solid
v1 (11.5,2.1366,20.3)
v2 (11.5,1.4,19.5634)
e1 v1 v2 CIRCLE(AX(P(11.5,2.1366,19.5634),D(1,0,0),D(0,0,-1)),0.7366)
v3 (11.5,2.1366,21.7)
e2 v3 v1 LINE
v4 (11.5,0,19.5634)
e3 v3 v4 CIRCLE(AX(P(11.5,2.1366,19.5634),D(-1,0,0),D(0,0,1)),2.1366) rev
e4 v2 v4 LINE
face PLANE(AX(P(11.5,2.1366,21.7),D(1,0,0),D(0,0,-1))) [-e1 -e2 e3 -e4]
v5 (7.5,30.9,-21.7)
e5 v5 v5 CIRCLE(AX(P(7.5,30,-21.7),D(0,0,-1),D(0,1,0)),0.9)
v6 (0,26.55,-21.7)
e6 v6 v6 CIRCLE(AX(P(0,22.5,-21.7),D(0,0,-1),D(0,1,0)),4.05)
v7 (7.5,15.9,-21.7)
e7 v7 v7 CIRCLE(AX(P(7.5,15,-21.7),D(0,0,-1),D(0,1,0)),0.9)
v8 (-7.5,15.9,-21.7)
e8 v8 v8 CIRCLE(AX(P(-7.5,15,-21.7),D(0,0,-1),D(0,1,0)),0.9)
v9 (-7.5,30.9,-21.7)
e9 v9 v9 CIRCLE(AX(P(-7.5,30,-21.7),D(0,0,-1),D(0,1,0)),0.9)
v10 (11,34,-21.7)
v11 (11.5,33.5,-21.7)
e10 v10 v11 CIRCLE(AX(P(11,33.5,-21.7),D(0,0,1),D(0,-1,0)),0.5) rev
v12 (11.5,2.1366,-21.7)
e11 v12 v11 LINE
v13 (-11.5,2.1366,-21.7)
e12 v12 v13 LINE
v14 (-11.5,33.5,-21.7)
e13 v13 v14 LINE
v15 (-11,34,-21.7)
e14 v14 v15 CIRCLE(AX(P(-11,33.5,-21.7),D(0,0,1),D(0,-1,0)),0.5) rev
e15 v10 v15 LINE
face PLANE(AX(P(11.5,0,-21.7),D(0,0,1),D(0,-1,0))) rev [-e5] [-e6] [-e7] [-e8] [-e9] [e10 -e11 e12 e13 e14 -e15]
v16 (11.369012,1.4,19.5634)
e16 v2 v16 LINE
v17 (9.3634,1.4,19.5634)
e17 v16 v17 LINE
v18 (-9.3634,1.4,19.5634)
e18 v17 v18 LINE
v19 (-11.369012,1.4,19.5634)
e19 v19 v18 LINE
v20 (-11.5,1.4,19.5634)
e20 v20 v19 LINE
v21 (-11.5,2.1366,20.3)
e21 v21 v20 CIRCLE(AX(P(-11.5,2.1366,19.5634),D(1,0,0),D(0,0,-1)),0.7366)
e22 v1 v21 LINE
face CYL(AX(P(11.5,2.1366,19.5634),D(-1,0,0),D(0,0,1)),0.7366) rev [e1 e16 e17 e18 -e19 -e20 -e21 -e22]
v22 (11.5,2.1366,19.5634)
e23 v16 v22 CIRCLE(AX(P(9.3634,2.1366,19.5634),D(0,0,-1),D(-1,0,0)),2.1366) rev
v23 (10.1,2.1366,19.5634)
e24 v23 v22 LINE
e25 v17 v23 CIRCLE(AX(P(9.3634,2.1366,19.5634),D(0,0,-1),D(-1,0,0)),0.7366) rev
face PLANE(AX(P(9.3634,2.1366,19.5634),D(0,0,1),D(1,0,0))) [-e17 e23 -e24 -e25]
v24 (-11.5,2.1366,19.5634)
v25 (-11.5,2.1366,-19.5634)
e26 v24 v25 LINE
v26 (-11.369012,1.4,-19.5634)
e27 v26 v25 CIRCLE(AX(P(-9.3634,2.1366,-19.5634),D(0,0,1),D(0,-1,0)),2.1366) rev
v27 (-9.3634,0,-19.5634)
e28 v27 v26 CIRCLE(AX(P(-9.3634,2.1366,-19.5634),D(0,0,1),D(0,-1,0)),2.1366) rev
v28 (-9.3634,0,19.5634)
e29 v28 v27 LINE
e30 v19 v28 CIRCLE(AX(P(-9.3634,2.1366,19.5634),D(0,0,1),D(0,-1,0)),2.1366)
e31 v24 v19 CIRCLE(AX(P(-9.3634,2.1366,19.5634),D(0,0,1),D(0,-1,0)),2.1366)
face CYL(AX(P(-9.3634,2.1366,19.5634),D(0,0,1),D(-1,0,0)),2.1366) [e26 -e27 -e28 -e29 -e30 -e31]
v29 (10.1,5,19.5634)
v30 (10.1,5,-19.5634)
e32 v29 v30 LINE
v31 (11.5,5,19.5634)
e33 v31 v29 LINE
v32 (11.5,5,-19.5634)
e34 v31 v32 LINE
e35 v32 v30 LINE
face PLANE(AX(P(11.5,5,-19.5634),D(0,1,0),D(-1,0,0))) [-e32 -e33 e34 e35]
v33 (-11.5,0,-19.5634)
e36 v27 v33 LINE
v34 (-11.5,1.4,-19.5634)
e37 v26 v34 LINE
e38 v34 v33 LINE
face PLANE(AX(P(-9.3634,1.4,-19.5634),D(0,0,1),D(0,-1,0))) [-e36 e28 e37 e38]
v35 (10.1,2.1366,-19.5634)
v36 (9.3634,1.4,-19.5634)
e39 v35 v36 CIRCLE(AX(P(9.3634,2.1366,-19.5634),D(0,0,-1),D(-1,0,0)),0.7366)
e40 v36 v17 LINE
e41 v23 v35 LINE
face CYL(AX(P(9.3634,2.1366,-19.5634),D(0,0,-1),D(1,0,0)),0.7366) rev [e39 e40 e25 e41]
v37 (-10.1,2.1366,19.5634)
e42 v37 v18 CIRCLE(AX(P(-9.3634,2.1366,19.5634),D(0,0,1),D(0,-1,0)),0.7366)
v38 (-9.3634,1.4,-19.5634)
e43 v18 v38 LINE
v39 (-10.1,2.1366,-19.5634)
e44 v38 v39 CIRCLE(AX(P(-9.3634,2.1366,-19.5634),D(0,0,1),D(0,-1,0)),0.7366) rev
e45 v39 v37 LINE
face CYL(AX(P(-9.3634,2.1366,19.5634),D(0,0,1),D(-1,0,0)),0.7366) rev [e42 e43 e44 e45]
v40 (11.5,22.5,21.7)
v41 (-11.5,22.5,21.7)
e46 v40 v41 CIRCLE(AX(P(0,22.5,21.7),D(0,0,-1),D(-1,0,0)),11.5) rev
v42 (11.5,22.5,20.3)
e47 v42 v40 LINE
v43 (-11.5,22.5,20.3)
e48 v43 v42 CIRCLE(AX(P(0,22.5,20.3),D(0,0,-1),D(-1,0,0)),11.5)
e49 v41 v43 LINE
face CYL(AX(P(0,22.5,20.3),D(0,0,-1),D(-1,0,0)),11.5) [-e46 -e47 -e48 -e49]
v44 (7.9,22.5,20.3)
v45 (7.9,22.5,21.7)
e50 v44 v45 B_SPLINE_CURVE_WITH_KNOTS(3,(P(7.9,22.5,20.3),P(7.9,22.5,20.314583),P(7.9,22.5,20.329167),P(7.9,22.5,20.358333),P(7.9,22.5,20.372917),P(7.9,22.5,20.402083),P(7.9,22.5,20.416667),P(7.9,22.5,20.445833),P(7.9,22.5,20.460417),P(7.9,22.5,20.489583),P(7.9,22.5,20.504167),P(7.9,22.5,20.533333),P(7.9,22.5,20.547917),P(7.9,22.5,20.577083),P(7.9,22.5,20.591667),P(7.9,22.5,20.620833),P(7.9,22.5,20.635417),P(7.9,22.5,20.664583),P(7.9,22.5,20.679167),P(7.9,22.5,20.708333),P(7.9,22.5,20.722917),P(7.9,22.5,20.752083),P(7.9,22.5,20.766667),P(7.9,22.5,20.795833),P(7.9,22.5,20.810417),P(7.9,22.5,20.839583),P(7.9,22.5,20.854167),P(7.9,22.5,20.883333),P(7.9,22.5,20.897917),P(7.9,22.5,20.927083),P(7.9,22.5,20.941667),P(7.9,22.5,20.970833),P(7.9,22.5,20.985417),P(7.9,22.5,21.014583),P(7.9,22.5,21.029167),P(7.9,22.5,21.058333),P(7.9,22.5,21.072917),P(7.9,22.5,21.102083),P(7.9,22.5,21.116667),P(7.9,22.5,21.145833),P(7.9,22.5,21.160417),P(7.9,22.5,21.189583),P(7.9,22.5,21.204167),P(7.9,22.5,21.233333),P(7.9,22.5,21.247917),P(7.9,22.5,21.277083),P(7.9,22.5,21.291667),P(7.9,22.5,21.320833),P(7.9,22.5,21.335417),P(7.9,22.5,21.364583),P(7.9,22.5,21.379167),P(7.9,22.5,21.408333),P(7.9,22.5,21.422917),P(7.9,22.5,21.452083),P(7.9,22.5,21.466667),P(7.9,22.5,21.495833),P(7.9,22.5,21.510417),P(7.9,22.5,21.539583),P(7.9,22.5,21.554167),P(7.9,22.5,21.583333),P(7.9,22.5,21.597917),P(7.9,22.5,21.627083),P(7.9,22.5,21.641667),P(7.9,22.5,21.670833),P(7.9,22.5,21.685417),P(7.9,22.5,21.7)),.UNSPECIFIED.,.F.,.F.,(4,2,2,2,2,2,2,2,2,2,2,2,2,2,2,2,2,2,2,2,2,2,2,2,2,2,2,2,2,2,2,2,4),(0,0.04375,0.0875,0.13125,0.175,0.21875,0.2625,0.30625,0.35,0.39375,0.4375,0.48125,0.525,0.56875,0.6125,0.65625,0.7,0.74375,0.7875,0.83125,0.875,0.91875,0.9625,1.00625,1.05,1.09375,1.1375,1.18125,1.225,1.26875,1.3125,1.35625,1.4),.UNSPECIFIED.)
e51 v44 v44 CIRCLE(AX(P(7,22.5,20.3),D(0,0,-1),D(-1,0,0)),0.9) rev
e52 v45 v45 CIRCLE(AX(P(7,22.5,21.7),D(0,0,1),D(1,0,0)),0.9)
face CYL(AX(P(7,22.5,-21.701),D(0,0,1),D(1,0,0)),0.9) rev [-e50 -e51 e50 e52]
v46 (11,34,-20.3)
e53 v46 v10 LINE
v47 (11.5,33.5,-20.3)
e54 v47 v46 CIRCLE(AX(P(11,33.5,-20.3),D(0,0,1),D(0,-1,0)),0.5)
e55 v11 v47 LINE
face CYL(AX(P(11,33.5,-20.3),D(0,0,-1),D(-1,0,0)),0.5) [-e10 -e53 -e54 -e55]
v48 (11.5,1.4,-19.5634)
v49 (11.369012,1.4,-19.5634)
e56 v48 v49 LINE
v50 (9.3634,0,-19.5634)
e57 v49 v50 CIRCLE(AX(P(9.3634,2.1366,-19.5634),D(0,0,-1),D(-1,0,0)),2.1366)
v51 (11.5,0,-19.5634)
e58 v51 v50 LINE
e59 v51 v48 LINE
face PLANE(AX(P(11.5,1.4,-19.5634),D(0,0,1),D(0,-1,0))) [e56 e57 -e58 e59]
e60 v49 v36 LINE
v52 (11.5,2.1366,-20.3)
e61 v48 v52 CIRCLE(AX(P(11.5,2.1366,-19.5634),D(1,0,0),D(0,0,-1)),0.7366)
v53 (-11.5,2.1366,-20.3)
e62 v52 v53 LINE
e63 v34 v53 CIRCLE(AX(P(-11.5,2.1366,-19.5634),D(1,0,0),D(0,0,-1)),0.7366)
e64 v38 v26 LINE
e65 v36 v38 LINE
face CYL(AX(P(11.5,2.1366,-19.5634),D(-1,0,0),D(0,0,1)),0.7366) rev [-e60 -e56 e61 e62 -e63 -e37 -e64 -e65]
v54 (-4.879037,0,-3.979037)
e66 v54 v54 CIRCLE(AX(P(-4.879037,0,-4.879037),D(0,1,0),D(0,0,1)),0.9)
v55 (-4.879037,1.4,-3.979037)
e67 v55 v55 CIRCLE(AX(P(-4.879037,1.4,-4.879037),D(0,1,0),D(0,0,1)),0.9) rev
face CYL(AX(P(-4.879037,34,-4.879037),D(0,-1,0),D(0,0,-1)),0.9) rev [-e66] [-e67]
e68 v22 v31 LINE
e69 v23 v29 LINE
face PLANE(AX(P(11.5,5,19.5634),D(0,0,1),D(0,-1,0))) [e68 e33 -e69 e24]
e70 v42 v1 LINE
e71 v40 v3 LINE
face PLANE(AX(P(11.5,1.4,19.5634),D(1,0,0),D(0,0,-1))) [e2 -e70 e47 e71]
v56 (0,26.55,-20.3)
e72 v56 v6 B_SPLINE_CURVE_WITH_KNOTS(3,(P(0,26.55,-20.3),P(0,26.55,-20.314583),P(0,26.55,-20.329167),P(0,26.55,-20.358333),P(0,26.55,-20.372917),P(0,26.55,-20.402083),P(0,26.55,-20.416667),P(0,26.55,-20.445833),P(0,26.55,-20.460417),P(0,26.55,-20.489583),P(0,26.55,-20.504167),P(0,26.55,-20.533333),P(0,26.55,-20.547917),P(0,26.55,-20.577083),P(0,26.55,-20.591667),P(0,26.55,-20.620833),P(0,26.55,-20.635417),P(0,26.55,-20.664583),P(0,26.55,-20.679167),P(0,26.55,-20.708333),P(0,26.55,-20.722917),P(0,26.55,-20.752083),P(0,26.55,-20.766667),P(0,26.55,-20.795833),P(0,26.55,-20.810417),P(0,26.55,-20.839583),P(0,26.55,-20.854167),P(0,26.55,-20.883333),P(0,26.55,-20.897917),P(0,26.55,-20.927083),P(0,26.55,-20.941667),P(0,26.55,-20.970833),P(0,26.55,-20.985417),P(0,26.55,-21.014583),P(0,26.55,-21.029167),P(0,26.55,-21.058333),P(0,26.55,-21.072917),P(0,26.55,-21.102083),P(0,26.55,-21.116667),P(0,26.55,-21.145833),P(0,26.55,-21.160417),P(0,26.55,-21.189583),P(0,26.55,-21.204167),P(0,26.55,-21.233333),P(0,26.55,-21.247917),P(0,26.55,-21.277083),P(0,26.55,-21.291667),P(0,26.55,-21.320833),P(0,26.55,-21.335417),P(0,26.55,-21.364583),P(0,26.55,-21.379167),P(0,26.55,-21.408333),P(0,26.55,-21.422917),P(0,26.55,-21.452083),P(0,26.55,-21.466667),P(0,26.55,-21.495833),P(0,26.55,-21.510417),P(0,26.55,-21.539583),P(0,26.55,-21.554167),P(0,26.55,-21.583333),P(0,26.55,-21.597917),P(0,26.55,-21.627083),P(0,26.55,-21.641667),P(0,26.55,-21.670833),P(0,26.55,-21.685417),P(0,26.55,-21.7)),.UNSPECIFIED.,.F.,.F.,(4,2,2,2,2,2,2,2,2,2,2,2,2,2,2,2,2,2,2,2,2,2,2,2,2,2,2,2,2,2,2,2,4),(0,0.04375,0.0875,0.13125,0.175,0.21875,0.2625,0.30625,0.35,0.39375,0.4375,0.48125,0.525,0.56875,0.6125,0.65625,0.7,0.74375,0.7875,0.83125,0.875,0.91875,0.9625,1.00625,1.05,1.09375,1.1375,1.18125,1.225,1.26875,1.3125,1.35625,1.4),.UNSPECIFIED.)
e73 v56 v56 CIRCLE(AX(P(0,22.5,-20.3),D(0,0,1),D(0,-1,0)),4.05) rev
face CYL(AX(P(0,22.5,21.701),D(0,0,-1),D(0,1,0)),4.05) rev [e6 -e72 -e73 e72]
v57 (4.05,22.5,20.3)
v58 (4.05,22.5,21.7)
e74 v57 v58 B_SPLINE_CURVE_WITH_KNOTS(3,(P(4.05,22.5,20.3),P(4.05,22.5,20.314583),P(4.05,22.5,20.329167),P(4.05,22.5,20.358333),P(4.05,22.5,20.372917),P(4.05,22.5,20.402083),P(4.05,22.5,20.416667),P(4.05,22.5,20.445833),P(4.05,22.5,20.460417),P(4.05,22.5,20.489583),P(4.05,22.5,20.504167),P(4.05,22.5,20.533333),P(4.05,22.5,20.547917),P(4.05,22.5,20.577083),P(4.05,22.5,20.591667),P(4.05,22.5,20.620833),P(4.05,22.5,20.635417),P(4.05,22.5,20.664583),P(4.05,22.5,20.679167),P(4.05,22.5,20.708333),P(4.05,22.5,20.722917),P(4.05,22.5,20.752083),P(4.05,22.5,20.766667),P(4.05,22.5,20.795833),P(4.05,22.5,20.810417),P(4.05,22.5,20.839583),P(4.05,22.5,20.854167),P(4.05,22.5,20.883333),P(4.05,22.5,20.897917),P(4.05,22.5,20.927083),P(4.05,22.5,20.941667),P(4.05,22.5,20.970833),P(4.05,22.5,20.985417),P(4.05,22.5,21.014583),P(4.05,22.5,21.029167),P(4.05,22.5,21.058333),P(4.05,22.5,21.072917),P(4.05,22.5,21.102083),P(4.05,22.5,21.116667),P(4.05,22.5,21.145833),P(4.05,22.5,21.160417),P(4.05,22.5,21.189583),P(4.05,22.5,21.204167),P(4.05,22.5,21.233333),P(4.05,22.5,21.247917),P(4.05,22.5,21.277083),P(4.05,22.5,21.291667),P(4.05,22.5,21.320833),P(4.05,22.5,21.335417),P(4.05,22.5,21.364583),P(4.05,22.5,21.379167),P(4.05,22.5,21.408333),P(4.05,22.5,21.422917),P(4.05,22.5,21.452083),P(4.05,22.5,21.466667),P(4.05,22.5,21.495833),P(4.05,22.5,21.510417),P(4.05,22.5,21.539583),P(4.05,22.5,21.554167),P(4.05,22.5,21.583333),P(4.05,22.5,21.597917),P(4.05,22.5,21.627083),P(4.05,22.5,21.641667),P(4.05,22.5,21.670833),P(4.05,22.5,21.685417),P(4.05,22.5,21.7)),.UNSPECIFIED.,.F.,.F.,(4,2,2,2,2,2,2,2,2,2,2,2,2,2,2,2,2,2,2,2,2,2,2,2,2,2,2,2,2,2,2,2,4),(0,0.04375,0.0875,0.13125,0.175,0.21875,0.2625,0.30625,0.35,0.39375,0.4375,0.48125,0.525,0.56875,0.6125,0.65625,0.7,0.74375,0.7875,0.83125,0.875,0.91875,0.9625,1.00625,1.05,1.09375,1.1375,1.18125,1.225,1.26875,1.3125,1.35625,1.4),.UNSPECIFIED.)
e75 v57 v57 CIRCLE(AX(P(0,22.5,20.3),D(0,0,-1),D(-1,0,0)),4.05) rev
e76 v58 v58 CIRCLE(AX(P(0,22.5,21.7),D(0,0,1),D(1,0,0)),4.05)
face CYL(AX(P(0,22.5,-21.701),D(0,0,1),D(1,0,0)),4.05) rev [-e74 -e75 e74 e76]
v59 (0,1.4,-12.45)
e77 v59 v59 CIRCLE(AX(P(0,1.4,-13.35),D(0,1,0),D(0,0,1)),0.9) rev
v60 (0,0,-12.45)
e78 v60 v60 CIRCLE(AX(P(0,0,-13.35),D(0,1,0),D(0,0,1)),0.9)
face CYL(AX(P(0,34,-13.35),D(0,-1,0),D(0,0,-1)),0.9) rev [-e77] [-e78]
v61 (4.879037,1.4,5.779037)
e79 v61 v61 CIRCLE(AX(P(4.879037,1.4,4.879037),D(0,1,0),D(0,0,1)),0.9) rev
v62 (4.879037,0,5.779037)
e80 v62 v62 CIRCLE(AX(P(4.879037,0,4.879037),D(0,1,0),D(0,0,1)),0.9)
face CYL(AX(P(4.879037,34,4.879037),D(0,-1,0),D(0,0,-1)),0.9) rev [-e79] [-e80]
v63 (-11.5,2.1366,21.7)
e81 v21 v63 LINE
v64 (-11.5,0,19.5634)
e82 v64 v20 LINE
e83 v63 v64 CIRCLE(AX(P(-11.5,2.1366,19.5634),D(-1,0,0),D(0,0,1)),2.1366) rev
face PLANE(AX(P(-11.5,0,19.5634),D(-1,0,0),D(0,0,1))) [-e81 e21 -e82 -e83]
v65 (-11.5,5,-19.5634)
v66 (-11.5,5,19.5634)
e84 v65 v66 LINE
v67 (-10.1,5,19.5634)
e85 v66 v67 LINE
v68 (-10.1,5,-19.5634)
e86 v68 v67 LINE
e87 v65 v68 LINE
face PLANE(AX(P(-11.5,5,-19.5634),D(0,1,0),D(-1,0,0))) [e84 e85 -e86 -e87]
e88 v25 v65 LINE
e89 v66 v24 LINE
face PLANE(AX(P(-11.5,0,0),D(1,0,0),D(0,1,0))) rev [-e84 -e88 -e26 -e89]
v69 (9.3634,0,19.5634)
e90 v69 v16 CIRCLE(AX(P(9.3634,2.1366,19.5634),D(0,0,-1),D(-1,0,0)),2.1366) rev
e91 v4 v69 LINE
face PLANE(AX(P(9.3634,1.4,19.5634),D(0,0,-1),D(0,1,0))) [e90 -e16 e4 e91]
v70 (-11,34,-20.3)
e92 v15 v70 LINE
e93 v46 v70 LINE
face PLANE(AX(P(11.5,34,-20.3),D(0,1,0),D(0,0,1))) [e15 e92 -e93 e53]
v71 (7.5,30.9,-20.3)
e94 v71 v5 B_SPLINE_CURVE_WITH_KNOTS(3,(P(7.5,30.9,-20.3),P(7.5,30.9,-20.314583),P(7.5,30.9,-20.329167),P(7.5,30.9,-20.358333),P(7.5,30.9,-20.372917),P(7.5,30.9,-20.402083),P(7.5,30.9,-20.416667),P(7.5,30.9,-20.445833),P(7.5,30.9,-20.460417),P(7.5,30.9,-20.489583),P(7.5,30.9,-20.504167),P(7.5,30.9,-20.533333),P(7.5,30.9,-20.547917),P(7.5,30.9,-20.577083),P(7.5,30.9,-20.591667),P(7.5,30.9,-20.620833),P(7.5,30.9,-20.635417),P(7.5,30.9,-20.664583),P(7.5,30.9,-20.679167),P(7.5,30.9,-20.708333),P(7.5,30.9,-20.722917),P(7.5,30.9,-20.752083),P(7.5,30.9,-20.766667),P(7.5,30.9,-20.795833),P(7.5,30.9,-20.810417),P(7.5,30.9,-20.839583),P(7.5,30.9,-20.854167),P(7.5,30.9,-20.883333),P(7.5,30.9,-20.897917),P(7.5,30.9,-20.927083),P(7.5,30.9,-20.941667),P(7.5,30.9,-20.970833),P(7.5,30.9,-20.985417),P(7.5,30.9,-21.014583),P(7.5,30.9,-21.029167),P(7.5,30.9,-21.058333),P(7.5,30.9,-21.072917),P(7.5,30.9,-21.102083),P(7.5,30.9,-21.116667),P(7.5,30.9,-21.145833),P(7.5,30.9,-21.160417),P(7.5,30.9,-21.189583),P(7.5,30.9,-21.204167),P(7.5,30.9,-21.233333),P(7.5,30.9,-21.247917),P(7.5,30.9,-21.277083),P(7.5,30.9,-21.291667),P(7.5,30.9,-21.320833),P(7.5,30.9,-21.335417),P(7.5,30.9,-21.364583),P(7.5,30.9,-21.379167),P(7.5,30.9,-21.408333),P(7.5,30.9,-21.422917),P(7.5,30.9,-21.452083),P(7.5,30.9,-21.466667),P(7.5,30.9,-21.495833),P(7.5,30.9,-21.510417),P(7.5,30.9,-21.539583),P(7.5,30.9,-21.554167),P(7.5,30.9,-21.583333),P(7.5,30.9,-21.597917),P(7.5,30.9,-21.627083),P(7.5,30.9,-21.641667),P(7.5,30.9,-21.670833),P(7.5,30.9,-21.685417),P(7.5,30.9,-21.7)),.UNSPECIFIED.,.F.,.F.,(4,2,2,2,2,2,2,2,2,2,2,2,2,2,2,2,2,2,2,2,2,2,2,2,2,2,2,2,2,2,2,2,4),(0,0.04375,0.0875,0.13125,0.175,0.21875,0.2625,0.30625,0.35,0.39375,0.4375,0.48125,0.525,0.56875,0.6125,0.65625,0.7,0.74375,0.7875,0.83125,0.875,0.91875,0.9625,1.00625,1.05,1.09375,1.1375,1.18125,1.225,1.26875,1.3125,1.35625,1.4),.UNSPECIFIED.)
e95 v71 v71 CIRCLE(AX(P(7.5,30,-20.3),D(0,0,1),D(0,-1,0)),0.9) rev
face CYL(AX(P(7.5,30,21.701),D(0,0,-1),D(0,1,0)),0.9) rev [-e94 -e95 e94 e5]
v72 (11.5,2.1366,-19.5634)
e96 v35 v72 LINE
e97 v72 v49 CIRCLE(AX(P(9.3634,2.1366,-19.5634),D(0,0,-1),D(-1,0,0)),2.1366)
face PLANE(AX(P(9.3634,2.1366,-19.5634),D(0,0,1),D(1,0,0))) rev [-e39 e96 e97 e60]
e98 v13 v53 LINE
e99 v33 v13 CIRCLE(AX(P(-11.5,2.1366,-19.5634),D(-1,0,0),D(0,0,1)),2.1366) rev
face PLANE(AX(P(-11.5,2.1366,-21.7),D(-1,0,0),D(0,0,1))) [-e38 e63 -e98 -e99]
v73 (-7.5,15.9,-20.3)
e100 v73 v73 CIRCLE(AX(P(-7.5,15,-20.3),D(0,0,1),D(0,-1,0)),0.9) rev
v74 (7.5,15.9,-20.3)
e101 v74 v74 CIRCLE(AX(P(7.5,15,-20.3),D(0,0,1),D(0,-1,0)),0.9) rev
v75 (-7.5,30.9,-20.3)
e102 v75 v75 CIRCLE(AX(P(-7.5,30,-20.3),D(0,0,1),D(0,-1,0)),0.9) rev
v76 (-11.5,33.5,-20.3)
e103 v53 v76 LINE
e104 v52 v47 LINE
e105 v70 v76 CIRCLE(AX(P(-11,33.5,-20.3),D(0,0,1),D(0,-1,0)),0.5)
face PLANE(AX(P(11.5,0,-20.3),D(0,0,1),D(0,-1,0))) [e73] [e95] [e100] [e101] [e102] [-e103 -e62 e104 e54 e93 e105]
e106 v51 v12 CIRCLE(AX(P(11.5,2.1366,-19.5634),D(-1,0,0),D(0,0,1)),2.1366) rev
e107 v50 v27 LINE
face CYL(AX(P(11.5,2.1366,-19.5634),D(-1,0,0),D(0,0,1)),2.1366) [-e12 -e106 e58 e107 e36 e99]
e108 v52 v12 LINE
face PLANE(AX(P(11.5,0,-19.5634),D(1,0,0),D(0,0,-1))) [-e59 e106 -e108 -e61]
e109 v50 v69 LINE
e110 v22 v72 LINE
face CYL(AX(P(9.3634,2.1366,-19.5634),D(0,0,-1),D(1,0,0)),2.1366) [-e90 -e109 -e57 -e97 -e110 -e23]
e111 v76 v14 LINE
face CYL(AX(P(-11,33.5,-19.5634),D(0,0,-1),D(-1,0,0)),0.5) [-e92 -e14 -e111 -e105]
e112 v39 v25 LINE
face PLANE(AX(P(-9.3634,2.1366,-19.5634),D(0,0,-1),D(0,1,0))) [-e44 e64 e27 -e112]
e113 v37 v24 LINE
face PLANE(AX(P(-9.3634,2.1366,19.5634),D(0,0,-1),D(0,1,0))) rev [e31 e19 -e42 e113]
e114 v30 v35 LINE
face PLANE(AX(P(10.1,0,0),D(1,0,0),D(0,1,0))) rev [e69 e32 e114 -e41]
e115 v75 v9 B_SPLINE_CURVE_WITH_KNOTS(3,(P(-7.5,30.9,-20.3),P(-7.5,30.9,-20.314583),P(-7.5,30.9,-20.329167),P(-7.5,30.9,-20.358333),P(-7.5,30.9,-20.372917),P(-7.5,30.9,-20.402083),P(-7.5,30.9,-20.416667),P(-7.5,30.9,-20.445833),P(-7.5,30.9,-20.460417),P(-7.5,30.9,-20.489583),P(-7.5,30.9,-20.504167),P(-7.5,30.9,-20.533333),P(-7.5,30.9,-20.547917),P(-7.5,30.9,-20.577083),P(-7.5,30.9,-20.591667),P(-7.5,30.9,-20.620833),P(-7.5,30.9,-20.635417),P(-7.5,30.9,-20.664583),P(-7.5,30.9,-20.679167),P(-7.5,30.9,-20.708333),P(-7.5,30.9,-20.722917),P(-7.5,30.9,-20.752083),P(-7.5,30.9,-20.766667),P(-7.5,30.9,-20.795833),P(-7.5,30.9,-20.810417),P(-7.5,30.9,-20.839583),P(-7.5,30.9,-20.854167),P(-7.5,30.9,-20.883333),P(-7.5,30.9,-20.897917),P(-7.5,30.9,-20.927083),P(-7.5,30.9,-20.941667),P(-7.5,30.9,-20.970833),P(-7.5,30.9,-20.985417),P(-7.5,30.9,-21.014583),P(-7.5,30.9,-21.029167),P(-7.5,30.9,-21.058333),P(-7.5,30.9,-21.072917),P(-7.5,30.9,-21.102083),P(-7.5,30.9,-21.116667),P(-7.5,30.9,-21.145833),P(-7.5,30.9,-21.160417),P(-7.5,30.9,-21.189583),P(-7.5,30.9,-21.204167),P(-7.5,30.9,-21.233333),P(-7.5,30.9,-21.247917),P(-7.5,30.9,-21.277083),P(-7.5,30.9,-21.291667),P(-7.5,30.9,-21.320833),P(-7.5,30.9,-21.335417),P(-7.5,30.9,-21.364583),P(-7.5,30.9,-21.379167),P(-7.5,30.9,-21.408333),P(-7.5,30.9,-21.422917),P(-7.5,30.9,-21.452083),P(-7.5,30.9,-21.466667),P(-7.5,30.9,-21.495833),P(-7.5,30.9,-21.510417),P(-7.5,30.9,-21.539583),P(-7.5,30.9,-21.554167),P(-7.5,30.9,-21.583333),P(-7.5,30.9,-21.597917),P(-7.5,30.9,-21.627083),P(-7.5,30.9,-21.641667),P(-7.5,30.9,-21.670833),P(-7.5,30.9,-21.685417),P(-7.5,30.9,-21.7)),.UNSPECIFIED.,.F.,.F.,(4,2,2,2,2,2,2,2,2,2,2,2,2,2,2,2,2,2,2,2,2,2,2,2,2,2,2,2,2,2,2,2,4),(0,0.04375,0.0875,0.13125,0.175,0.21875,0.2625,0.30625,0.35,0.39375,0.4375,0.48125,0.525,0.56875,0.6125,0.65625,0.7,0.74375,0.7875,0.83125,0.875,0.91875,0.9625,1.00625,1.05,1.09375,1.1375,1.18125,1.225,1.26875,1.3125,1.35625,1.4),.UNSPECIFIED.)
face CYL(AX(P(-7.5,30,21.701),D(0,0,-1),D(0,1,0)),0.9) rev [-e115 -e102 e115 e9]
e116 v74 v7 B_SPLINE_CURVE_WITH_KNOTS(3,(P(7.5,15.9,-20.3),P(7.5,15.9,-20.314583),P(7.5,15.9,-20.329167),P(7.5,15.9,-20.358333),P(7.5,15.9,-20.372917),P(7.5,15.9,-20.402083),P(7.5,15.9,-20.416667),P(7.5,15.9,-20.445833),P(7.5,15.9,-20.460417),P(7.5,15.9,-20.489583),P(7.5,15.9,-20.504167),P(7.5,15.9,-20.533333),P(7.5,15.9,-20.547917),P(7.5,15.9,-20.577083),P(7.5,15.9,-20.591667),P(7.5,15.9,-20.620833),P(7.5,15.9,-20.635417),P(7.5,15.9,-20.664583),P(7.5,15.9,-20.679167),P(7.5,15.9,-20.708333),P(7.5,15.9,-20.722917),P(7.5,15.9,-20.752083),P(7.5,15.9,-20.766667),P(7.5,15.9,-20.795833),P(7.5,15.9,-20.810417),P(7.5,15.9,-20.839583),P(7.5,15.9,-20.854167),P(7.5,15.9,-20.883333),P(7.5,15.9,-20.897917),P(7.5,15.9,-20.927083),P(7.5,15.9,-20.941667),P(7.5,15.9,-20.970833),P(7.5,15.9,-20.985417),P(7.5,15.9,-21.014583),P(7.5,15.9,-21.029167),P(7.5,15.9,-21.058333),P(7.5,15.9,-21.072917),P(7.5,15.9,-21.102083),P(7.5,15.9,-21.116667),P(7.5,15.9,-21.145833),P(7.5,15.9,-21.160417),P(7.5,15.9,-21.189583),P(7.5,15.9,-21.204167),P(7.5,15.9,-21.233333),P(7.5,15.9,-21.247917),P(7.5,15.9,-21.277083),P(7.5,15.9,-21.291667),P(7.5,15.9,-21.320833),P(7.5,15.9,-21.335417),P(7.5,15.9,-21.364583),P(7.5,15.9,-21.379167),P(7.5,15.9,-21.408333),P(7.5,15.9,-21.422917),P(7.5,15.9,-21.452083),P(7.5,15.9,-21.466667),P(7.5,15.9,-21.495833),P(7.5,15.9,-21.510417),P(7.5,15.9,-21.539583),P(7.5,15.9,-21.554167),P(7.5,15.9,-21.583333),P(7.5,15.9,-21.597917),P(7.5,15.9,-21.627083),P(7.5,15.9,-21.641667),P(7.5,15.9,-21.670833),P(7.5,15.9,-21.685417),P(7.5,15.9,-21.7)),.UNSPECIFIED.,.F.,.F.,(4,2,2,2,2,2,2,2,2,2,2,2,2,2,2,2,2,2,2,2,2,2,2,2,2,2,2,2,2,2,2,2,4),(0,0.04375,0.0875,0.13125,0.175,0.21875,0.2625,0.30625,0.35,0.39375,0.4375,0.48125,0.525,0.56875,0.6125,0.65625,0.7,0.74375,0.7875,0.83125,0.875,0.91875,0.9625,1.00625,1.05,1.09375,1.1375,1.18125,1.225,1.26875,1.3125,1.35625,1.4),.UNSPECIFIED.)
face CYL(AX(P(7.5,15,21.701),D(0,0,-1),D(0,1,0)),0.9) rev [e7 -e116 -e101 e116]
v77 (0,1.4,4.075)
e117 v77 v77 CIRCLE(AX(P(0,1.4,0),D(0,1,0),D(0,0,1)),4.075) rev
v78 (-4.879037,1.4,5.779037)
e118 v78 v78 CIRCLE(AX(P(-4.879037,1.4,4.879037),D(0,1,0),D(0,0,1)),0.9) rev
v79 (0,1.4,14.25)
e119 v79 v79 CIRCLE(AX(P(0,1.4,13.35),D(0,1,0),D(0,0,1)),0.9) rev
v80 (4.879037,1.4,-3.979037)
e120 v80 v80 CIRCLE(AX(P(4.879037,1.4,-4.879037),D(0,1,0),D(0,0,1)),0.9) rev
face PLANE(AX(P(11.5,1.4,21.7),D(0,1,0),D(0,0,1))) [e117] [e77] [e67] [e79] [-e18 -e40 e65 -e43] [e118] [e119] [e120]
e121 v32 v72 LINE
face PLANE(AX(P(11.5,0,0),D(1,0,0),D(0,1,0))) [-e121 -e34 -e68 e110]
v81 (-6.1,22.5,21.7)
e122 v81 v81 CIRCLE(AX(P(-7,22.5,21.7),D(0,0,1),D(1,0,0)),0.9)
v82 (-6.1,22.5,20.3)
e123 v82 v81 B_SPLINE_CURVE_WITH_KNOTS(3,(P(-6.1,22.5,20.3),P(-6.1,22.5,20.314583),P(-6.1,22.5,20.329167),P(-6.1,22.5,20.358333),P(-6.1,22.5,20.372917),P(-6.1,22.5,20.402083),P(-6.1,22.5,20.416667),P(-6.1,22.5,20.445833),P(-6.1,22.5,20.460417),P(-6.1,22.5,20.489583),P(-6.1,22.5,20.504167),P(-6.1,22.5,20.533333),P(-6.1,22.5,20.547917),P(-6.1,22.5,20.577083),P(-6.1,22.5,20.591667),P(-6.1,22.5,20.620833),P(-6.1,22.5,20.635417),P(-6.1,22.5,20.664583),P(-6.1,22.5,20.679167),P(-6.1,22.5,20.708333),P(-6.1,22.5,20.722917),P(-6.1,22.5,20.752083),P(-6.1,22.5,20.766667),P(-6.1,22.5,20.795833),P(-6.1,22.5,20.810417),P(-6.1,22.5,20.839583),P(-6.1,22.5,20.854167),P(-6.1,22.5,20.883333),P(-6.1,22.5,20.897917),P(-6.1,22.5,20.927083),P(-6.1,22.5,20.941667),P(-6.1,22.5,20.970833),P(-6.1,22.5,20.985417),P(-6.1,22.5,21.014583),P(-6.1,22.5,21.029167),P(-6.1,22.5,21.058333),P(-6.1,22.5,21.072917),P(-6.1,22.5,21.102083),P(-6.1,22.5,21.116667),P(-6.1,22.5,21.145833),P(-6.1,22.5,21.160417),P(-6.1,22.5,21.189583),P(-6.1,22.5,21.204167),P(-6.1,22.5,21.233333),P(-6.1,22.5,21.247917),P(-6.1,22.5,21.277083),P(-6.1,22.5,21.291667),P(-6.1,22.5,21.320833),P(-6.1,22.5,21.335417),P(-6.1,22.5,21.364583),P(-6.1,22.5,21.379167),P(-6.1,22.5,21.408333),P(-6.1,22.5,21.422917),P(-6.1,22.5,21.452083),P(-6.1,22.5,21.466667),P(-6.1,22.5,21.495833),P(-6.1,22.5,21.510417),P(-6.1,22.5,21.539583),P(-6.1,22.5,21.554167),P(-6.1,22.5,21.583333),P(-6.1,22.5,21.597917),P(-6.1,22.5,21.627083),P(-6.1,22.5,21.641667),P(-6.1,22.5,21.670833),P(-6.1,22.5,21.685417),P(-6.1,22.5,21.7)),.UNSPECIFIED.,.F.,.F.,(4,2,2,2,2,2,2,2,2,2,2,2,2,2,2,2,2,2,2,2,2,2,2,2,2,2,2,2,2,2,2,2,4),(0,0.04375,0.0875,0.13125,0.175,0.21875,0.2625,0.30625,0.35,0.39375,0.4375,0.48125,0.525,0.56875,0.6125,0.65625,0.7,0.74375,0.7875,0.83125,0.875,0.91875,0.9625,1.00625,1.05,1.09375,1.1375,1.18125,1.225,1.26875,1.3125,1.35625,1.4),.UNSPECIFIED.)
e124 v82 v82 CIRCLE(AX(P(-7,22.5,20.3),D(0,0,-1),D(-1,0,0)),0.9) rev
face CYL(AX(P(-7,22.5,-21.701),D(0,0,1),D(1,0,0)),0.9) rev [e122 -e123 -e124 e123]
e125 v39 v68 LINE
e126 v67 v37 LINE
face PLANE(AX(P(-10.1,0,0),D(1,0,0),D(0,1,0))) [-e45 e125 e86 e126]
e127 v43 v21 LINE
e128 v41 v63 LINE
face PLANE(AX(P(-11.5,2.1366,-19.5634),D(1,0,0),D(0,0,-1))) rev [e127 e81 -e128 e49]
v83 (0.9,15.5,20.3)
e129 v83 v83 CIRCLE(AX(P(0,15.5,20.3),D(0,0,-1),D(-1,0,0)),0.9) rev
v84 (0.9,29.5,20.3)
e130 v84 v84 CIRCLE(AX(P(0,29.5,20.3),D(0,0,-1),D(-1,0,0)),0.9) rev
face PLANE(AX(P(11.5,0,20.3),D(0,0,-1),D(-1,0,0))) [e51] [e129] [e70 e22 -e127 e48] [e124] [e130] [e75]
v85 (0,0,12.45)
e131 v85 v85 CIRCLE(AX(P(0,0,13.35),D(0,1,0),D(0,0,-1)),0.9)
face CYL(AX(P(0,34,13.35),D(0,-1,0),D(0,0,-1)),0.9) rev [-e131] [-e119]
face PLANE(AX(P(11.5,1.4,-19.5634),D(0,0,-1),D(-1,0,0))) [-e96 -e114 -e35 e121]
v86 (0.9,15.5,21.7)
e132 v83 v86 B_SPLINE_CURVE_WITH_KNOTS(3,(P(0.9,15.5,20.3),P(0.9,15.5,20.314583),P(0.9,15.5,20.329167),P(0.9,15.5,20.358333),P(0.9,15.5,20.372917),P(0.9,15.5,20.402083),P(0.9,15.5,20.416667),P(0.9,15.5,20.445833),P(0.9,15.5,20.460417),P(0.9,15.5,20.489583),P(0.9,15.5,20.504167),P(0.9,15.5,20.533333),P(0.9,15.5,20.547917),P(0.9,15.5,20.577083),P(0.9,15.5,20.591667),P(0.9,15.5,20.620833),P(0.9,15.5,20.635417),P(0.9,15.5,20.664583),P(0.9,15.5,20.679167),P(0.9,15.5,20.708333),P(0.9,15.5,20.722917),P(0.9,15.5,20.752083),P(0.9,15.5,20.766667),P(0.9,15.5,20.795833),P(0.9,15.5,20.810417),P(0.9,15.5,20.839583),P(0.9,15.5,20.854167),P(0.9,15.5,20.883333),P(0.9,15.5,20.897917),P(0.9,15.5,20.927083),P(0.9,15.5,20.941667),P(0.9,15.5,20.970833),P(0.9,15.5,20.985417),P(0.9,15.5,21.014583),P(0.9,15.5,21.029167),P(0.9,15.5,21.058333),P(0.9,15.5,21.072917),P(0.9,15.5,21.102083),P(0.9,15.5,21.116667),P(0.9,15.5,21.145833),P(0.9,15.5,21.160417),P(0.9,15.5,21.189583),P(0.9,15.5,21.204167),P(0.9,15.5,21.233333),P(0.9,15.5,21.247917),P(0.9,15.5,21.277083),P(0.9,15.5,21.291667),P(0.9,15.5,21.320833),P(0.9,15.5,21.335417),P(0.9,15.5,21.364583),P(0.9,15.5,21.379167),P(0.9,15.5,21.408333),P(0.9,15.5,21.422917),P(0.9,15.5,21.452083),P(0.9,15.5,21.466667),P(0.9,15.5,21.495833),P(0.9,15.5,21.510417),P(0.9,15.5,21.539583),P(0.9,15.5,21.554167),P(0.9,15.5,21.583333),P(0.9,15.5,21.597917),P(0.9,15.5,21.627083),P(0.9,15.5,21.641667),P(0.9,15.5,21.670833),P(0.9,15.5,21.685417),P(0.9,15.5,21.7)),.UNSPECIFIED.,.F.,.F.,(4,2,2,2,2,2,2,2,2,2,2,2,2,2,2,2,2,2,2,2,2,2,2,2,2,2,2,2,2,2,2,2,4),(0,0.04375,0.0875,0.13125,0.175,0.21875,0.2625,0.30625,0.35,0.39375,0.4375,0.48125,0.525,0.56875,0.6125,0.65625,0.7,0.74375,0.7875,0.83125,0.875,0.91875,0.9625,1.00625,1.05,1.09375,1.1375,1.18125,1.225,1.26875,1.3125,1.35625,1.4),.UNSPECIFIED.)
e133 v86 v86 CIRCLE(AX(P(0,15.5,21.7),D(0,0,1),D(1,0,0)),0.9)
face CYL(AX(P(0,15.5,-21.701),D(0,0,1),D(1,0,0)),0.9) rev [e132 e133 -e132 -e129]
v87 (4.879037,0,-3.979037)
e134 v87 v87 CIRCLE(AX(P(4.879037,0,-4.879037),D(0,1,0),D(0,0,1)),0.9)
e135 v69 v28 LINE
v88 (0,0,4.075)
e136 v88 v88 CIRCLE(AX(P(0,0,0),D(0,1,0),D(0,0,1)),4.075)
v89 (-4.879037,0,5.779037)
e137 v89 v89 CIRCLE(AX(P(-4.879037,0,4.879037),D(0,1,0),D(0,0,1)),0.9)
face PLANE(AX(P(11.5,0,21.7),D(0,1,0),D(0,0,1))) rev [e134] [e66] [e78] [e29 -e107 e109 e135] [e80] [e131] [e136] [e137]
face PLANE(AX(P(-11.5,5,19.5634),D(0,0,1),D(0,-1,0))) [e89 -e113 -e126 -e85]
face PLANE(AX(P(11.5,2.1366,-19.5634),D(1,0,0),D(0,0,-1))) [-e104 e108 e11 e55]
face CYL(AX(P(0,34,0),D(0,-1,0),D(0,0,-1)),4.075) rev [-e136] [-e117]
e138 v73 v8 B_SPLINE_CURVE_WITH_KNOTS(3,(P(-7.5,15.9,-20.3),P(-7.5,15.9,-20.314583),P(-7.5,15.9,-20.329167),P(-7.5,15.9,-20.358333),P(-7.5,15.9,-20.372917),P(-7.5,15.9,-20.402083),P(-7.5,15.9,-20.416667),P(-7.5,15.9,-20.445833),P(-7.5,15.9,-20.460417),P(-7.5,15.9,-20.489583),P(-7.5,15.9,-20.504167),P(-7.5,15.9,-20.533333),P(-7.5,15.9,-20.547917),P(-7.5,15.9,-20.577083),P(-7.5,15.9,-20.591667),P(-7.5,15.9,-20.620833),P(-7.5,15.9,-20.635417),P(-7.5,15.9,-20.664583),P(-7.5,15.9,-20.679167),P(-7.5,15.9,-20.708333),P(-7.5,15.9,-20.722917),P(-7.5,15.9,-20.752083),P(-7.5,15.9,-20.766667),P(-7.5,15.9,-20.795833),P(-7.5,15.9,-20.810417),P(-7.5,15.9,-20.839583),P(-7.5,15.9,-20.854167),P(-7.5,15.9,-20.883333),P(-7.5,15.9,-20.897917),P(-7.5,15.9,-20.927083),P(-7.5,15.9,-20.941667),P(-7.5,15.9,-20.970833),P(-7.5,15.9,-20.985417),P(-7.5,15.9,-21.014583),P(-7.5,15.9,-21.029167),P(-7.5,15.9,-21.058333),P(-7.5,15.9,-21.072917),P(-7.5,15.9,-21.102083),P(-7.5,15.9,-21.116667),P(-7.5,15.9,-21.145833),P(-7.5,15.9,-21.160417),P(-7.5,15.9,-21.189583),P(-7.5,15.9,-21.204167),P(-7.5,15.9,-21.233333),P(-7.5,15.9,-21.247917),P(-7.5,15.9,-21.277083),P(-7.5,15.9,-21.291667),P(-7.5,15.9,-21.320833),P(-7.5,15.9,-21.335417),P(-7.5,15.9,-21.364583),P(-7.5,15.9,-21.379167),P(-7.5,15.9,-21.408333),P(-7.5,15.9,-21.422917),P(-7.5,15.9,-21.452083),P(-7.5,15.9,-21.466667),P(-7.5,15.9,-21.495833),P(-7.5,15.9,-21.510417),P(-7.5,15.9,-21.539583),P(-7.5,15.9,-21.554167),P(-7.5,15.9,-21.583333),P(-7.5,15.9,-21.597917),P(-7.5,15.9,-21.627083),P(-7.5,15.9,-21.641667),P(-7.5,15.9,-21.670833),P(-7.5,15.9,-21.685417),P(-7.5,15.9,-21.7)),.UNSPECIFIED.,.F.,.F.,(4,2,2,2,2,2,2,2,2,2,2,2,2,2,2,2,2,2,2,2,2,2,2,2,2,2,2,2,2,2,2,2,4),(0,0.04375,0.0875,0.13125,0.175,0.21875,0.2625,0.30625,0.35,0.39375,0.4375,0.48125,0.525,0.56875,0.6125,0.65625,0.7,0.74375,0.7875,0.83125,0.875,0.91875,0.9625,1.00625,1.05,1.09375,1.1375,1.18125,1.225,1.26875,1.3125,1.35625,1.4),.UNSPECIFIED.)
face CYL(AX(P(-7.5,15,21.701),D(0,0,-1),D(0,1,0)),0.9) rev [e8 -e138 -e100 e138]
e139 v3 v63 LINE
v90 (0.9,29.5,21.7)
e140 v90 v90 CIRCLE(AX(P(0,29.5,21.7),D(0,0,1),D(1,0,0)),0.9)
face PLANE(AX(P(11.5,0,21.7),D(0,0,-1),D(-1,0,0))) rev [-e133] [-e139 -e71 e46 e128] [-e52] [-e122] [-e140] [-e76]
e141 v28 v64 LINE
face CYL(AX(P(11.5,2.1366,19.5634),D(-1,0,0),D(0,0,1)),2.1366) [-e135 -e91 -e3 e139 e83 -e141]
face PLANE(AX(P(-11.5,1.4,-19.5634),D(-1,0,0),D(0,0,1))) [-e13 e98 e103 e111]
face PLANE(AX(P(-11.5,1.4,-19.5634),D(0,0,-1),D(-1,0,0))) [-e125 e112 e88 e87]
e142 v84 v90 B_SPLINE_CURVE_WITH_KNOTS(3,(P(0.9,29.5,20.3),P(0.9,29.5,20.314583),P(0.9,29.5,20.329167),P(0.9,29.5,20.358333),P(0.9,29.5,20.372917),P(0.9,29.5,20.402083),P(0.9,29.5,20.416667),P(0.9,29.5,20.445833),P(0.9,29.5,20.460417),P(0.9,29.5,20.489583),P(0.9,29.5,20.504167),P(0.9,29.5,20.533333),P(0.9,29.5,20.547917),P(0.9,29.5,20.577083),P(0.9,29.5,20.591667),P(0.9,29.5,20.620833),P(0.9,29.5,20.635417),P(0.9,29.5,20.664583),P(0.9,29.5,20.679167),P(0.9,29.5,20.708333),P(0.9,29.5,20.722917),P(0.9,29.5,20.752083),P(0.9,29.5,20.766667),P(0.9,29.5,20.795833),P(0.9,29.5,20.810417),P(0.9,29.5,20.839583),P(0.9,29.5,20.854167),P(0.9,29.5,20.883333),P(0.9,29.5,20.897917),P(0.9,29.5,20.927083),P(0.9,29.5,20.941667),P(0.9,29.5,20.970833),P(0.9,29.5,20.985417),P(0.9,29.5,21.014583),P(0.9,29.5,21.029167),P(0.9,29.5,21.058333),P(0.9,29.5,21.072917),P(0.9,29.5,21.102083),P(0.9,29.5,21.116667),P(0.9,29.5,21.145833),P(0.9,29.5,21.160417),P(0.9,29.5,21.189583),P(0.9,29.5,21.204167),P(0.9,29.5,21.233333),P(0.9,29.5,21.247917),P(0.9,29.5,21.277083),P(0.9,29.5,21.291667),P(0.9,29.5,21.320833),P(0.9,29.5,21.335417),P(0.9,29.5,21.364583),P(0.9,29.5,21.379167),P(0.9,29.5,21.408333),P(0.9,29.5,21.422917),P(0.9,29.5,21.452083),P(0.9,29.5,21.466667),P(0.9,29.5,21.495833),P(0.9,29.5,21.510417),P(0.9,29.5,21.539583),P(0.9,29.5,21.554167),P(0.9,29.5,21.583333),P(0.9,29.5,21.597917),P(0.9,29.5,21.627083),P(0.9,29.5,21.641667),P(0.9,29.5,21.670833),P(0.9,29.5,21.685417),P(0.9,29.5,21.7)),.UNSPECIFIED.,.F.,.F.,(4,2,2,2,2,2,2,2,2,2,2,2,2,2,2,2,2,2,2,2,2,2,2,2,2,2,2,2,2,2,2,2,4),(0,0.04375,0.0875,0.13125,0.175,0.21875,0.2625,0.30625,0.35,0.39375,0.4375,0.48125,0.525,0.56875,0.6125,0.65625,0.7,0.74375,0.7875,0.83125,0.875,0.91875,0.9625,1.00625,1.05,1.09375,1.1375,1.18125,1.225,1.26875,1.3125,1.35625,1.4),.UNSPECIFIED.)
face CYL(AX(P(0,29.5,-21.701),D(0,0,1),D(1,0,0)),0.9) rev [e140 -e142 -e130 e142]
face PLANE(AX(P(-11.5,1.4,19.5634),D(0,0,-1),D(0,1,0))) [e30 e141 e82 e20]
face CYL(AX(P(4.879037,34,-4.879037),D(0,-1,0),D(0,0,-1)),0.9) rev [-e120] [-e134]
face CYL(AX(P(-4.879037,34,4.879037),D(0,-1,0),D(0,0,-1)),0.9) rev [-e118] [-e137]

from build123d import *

# Parameters (mm, degrees)
BASE_FLANGE1_START             = -11.5
BASE_FLANGE1_DEPTH             = 23
EDGE_FLANGE1_STRIP_W           = 7.0732
EDGE_FLANGE1_STRIP_H           = 1.4
EDGE_FLANGE1_STRIP_CUT_DEPTH   = 39.1268
EDGE_FLANGE1_STRIP_2_W         = 7.0732
EDGE_FLANGE1_STRIP_2_H         = 1.4
EDGE_FLANGE1_STRIP_CUT_2_DEPTH = 39.1268
EDGE_FLANGE1_DEPTH             = 39.1268
EDGE_FLANGE1_BEND_DEPTH        = 39.1268
FILLET1_RADIUS                 = 11.5
FILLET1_LENGTH                 = 1.4
CUT_EXTRUDE1_REACH             = 58.319
SKETCH12_R                     = 4.05
SKETCH12_R_2                   = 0.9
SKETCH13_R                     = 4.075
SKETCH13_R_2                   = 0.9
CUT_EXTRUDE2_DEPTH             = 42.942102952
FILLET2_R                      = 0.5
CUT_EXTRUDE3_REACH             = 58.319
SKETCH14_R                     = 4.05
SKETCH14_R_2                   = 0.9


# Read off the part's stored shape, not the designer's step: Base-Flange1
# Sheet-metal steps are written as plain solids
with BuildPart() as part:
    # Base-Flange1 outline → Base-Flange1 (new body)
    with BuildSketch(Plane(origin=(0, 0, 0), x_dir=(0, 0, -1), z_dir=(1, 0, 0)).offset(BASE_FLANGE1_START)):
        with BuildLine():
            Line((21.7, 2.1366), (21.7, 34))
            Line((21.7, 34), (20.3, 34))
            Line((20.3, 34), (20.3, 2.1366))
            ThreePointArc((20.3, 2.1366), (20.084254855, 1.615745145), (19.5634, 1.4))
            Line((19.5634, 1.4), (-19.5634, 1.4))
            ThreePointArc((-19.5634, 1.4), (-20.084254855, 1.615745145), (-20.3, 2.1366))
            Line((-20.3, 2.1366), (-20.3, 34))
            Line((-20.3, 34), (-21.7, 34))
            Line((-21.7, 34), (-21.7, 2.1366))
            ThreePointArc((-21.7, 2.1366), (-21.074204349, 0.625795651), (-19.5634, 0))
            Line((-19.5634, 0), (19.5634, 0))
            ThreePointArc((19.5634, 0), (21.074204349, 0.625795651), (21.7, 2.1366))
        make_face()
    extrude(amount=BASE_FLANGE1_DEPTH)

    # Edge-Flange1 strip (across the edge) → Edge-Flange1 strip cut (cut)
    with BuildSketch(Plane(origin=(11.5, 1.4, 19.5634), x_dir=(-1, 0, 0), z_dir=(0, 0, -1))):
        with Locations((-1.4, -0.7)):
            Rectangle(EDGE_FLANGE1_STRIP_W, EDGE_FLANGE1_STRIP_H)
    extrude(amount=EDGE_FLANGE1_STRIP_CUT_DEPTH, mode=Mode.SUBTRACT)

    # Edge-Flange1 strip 2 (across the edge) → Edge-Flange1 strip cut 2 (cut)
    with BuildSketch(Plane(origin=(-11.5, 1.4, -19.5634), x_dir=(1, 0, 0), z_dir=(0, 0, 1))):
        with Locations((-1.4, -0.7)):
            Rectangle(EDGE_FLANGE1_STRIP_2_W, EDGE_FLANGE1_STRIP_2_H)
    extrude(amount=EDGE_FLANGE1_STRIP_CUT_2_DEPTH, mode=Mode.SUBTRACT)

    # Edge-Flange1 section (across the edge) → Edge-Flange1 (add)
    with BuildSketch(Plane(origin=(11.5, 1.4, 19.5634), x_dir=(-1, 0, 0), z_dir=(0, 0, -1))):
        with BuildLine():
            Line((0, 0.7366), (0, 3.6))
            Line((0, 3.6), (1.4, 3.6))
            Line((1.4, 3.6), (1.4, 0.7366))
            ThreePointArc((1.4, 0.7366), (1.615745145, 0.215745145), (2.1366, 0))
            Line((2.1366, 0), (2.1366, -1.4))
            ThreePointArc((2.1366, -1.4), (0.625795651, -0.774204349), (0, 0.7366))
        make_face()
    extrude(amount=EDGE_FLANGE1_DEPTH)

    # Edge-Flange1 section 2 (across the edge) → Edge-Flange1 bend (add)
    with BuildSketch(Plane(origin=(-11.5, 1.4, -19.5634), x_dir=(1, 0, 0), z_dir=(0, 0, 1))):
        with BuildLine():
            Line((0, 0.7366), (0, 3.6))
            Line((0, 3.6), (1.4, 3.6))
            Line((1.4, 3.6), (1.4, 0.7366))
            ThreePointArc((1.4, 0.7366), (1.615745145, 0.215745145), (2.1366, 0))
            Line((2.1366, 0), (2.1366, -1.4))
            ThreePointArc((2.1366, -1.4), (0.625795651, -0.774204349), (0, 0.7366))
        make_face()
    extrude(amount=EDGE_FLANGE1_BEND_DEPTH)

    # Fillet1: full round fillet: the end face becomes a half cylinder, R = half its width
    fillet1_face = Plane((0, 34, 21), x_dir=(0, 0, 1), z_dir=(0, 1, 0))  # on the end face: x along it, z out of the body
    fillet1_slab = fillet1_face.offset(-FILLET1_RADIUS / 2) * Box(FILLET1_LENGTH, 2 * FILLET1_RADIUS, FILLET1_RADIUS, mode=Mode.PRIVATE)  # the body's end, R deep
    fillet1_round = Plane((0, 22.5, 21), x_dir=(0, 1, 0), z_dir=(0, 0, 1)) * Cylinder(FILLET1_RADIUS, FILLET1_LENGTH, mode=Mode.PRIVATE)  # its axis R under the face
    add(fillet1_slab - fillet1_round, mode=Mode.SUBTRACT)

    # Sketch12 → Cut-Extrude1 (cut, up to next)
    with BuildSketch(Plane.XY.offset(21.7), mode=Mode.PRIVATE) as cut_extrude1_sk1:
        with Locations((0, 22.5)):
            Circle(SKETCH12_R)
    cut_extrude1_tool1 = extrude(cut_extrude1_sk1.sketch, amount=-CUT_EXTRUDE1_REACH, mode=Mode.PRIVATE) & part.part
    # Sketch12 → Cut-Extrude1 (cut, up to next)
    with BuildSketch(Plane.XY.offset(21.7), mode=Mode.PRIVATE) as cut_extrude1_sk2:
        with Locations((0, 29.5)):
            Circle(SKETCH12_R_2)
    cut_extrude1_tool2 = extrude(cut_extrude1_sk2.sketch, amount=-CUT_EXTRUDE1_REACH, mode=Mode.PRIVATE) & part.part
    # Sketch12 → Cut-Extrude1 (cut, up to next)
    with BuildSketch(Plane.XY.offset(21.7), mode=Mode.PRIVATE) as cut_extrude1_sk3:
        with Locations((7, 22.5)):
            Circle(SKETCH12_R_2)
    cut_extrude1_tool3 = extrude(cut_extrude1_sk3.sketch, amount=-CUT_EXTRUDE1_REACH, mode=Mode.PRIVATE) & part.part
    # Sketch12 → Cut-Extrude1 (cut, up to next)
    with BuildSketch(Plane.XY.offset(21.7), mode=Mode.PRIVATE) as cut_extrude1_sk4:
        with Locations((0, 15.5)):
            Circle(SKETCH12_R_2)
    cut_extrude1_tool4 = extrude(cut_extrude1_sk4.sketch, amount=-CUT_EXTRUDE1_REACH, mode=Mode.PRIVATE) & part.part
    # Sketch12 → Cut-Extrude1 (cut, up to next)
    with BuildSketch(Plane.XY.offset(21.7), mode=Mode.PRIVATE) as cut_extrude1_sk5:
        with Locations((-7, 22.5)):
            Circle(SKETCH12_R_2)
    cut_extrude1_tool5 = extrude(cut_extrude1_sk5.sketch, amount=-CUT_EXTRUDE1_REACH, mode=Mode.PRIVATE) & part.part
    add(cut_extrude1_tool1.solids().sort_by_distance((0, 22.5, 21.7))[0], mode=Mode.SUBTRACT)
    add(cut_extrude1_tool2.solids().sort_by_distance((0, 29.5, 21.7))[0], mode=Mode.SUBTRACT)
    add(cut_extrude1_tool3.solids().sort_by_distance((7, 22.5, 21.7))[0], mode=Mode.SUBTRACT)
    add(cut_extrude1_tool4.solids().sort_by_distance((0, 15.5, 21.7))[0], mode=Mode.SUBTRACT)
    add(cut_extrude1_tool5.solids().sort_by_distance((-7, 22.5, 21.7))[0], mode=Mode.SUBTRACT)

    # Sketch13 → Cut-Extrude2 (cut, through all)
    with BuildSketch(Plane(origin=(0, 0, 0), x_dir=(1, 0, 0), z_dir=(0, 1, 0))):
        with Locations(Location((0, 0, 0), (0, 0, 270))):
            Circle(SKETCH13_R)
        with Locations(Location((-4.87903679, 4.87903679, 0), (0, 0, 270))):
            Circle(SKETCH13_R_2)
        with Locations(Location((4.87903679, 4.87903679, 0), (0, 0, 270))):
            Circle(SKETCH13_R_2)
        with Locations(Location((4.87903679, -4.87903679, 0), (0, 0, 270))):
            Circle(SKETCH13_R_2)
        with Locations(Location((-4.87903679, -4.87903679, 0), (0, 0, 270))):
            Circle(SKETCH13_R_2)
        with Locations(Location((0, 13.35, 0), (0, 0, 270))):
            Circle(SKETCH13_R_2)
        with Locations(Location((0, -13.35, 0), (0, 0, 90))):
            Circle(SKETCH13_R_2)
    extrude(amount=CUT_EXTRUDE2_DEPTH, mode=Mode.SUBTRACT)

    # Fillet2
    fillet2_edges = [part.edges().sort_by_distance(p)[0] for p in [
        (-11.5, 34, -21),
        (11.5, 34, -21),
    ]]
    fillet(fillet2_edges, radius=FILLET2_R)

    # Sketch14 → Cut-Extrude3 (cut, up to next)
    with BuildSketch(Plane(origin=(0, 0, -21.7), x_dir=(-1, 0, 0), z_dir=(0, 0, -1)), mode=Mode.PRIVATE) as cut_extrude3_sk1:
        with Locations(Location((0, 22.5, 0), (0, 0, 180))):
            Circle(SKETCH14_R)
    cut_extrude3_tool1 = extrude(cut_extrude3_sk1.sketch, amount=-CUT_EXTRUDE3_REACH, mode=Mode.PRIVATE) & part.part
    # Sketch14 → Cut-Extrude3 (cut, up to next)
    with BuildSketch(Plane(origin=(0, 0, -21.7), x_dir=(-1, 0, 0), z_dir=(0, 0, -1)), mode=Mode.PRIVATE) as cut_extrude3_sk2:
        with Locations(Location((-7.5, 30, 0), (0, 0, 90))):
            Circle(SKETCH14_R_2)
    cut_extrude3_tool2 = extrude(cut_extrude3_sk2.sketch, amount=-CUT_EXTRUDE3_REACH, mode=Mode.PRIVATE) & part.part
    # Sketch14 → Cut-Extrude3 (cut, up to next)
    with BuildSketch(Plane(origin=(0, 0, -21.7), x_dir=(-1, 0, 0), z_dir=(0, 0, -1)), mode=Mode.PRIVATE) as cut_extrude3_sk3:
        with Locations(Location((7.5, 30, 0), (0, 0, 90))):
            Circle(SKETCH14_R_2)
    cut_extrude3_tool3 = extrude(cut_extrude3_sk3.sketch, amount=-CUT_EXTRUDE3_REACH, mode=Mode.PRIVATE) & part.part
    # Sketch14 → Cut-Extrude3 (cut, up to next)
    with BuildSketch(Plane(origin=(0, 0, -21.7), x_dir=(-1, 0, 0), z_dir=(0, 0, -1)), mode=Mode.PRIVATE) as cut_extrude3_sk4:
        with Locations(Location((7.5, 15, 0), (0, 0, 90))):
            Circle(SKETCH14_R_2)
    cut_extrude3_tool4 = extrude(cut_extrude3_sk4.sketch, amount=-CUT_EXTRUDE3_REACH, mode=Mode.PRIVATE) & part.part
    # Sketch14 → Cut-Extrude3 (cut, up to next)
    with BuildSketch(Plane(origin=(0, 0, -21.7), x_dir=(-1, 0, 0), z_dir=(0, 0, -1)), mode=Mode.PRIVATE) as cut_extrude3_sk5:
        with Locations(Location((-7.5, 15, 0), (0, 0, 90))):
            Circle(SKETCH14_R_2)
    cut_extrude3_tool5 = extrude(cut_extrude3_sk5.sketch, amount=-CUT_EXTRUDE3_REACH, mode=Mode.PRIVATE) & part.part
    add(cut_extrude3_tool1.solids().sort_by_distance((0, 22.5, -21.7))[0], mode=Mode.SUBTRACT)
    add(cut_extrude3_tool2.solids().sort_by_distance((7.5, 30, -21.7))[0], mode=Mode.SUBTRACT)
    add(cut_extrude3_tool3.solids().sort_by_distance((-7.5, 30, -21.7))[0], mode=Mode.SUBTRACT)
    add(cut_extrude3_tool4.solids().sort_by_distance((-7.5, 15, -21.7))[0], mode=Mode.SUBTRACT)
    add(cut_extrude3_tool5.solids().sort_by_distance((7.5, 15, -21.7))[0], mode=Mode.SUBTRACT)


solid = part.part
